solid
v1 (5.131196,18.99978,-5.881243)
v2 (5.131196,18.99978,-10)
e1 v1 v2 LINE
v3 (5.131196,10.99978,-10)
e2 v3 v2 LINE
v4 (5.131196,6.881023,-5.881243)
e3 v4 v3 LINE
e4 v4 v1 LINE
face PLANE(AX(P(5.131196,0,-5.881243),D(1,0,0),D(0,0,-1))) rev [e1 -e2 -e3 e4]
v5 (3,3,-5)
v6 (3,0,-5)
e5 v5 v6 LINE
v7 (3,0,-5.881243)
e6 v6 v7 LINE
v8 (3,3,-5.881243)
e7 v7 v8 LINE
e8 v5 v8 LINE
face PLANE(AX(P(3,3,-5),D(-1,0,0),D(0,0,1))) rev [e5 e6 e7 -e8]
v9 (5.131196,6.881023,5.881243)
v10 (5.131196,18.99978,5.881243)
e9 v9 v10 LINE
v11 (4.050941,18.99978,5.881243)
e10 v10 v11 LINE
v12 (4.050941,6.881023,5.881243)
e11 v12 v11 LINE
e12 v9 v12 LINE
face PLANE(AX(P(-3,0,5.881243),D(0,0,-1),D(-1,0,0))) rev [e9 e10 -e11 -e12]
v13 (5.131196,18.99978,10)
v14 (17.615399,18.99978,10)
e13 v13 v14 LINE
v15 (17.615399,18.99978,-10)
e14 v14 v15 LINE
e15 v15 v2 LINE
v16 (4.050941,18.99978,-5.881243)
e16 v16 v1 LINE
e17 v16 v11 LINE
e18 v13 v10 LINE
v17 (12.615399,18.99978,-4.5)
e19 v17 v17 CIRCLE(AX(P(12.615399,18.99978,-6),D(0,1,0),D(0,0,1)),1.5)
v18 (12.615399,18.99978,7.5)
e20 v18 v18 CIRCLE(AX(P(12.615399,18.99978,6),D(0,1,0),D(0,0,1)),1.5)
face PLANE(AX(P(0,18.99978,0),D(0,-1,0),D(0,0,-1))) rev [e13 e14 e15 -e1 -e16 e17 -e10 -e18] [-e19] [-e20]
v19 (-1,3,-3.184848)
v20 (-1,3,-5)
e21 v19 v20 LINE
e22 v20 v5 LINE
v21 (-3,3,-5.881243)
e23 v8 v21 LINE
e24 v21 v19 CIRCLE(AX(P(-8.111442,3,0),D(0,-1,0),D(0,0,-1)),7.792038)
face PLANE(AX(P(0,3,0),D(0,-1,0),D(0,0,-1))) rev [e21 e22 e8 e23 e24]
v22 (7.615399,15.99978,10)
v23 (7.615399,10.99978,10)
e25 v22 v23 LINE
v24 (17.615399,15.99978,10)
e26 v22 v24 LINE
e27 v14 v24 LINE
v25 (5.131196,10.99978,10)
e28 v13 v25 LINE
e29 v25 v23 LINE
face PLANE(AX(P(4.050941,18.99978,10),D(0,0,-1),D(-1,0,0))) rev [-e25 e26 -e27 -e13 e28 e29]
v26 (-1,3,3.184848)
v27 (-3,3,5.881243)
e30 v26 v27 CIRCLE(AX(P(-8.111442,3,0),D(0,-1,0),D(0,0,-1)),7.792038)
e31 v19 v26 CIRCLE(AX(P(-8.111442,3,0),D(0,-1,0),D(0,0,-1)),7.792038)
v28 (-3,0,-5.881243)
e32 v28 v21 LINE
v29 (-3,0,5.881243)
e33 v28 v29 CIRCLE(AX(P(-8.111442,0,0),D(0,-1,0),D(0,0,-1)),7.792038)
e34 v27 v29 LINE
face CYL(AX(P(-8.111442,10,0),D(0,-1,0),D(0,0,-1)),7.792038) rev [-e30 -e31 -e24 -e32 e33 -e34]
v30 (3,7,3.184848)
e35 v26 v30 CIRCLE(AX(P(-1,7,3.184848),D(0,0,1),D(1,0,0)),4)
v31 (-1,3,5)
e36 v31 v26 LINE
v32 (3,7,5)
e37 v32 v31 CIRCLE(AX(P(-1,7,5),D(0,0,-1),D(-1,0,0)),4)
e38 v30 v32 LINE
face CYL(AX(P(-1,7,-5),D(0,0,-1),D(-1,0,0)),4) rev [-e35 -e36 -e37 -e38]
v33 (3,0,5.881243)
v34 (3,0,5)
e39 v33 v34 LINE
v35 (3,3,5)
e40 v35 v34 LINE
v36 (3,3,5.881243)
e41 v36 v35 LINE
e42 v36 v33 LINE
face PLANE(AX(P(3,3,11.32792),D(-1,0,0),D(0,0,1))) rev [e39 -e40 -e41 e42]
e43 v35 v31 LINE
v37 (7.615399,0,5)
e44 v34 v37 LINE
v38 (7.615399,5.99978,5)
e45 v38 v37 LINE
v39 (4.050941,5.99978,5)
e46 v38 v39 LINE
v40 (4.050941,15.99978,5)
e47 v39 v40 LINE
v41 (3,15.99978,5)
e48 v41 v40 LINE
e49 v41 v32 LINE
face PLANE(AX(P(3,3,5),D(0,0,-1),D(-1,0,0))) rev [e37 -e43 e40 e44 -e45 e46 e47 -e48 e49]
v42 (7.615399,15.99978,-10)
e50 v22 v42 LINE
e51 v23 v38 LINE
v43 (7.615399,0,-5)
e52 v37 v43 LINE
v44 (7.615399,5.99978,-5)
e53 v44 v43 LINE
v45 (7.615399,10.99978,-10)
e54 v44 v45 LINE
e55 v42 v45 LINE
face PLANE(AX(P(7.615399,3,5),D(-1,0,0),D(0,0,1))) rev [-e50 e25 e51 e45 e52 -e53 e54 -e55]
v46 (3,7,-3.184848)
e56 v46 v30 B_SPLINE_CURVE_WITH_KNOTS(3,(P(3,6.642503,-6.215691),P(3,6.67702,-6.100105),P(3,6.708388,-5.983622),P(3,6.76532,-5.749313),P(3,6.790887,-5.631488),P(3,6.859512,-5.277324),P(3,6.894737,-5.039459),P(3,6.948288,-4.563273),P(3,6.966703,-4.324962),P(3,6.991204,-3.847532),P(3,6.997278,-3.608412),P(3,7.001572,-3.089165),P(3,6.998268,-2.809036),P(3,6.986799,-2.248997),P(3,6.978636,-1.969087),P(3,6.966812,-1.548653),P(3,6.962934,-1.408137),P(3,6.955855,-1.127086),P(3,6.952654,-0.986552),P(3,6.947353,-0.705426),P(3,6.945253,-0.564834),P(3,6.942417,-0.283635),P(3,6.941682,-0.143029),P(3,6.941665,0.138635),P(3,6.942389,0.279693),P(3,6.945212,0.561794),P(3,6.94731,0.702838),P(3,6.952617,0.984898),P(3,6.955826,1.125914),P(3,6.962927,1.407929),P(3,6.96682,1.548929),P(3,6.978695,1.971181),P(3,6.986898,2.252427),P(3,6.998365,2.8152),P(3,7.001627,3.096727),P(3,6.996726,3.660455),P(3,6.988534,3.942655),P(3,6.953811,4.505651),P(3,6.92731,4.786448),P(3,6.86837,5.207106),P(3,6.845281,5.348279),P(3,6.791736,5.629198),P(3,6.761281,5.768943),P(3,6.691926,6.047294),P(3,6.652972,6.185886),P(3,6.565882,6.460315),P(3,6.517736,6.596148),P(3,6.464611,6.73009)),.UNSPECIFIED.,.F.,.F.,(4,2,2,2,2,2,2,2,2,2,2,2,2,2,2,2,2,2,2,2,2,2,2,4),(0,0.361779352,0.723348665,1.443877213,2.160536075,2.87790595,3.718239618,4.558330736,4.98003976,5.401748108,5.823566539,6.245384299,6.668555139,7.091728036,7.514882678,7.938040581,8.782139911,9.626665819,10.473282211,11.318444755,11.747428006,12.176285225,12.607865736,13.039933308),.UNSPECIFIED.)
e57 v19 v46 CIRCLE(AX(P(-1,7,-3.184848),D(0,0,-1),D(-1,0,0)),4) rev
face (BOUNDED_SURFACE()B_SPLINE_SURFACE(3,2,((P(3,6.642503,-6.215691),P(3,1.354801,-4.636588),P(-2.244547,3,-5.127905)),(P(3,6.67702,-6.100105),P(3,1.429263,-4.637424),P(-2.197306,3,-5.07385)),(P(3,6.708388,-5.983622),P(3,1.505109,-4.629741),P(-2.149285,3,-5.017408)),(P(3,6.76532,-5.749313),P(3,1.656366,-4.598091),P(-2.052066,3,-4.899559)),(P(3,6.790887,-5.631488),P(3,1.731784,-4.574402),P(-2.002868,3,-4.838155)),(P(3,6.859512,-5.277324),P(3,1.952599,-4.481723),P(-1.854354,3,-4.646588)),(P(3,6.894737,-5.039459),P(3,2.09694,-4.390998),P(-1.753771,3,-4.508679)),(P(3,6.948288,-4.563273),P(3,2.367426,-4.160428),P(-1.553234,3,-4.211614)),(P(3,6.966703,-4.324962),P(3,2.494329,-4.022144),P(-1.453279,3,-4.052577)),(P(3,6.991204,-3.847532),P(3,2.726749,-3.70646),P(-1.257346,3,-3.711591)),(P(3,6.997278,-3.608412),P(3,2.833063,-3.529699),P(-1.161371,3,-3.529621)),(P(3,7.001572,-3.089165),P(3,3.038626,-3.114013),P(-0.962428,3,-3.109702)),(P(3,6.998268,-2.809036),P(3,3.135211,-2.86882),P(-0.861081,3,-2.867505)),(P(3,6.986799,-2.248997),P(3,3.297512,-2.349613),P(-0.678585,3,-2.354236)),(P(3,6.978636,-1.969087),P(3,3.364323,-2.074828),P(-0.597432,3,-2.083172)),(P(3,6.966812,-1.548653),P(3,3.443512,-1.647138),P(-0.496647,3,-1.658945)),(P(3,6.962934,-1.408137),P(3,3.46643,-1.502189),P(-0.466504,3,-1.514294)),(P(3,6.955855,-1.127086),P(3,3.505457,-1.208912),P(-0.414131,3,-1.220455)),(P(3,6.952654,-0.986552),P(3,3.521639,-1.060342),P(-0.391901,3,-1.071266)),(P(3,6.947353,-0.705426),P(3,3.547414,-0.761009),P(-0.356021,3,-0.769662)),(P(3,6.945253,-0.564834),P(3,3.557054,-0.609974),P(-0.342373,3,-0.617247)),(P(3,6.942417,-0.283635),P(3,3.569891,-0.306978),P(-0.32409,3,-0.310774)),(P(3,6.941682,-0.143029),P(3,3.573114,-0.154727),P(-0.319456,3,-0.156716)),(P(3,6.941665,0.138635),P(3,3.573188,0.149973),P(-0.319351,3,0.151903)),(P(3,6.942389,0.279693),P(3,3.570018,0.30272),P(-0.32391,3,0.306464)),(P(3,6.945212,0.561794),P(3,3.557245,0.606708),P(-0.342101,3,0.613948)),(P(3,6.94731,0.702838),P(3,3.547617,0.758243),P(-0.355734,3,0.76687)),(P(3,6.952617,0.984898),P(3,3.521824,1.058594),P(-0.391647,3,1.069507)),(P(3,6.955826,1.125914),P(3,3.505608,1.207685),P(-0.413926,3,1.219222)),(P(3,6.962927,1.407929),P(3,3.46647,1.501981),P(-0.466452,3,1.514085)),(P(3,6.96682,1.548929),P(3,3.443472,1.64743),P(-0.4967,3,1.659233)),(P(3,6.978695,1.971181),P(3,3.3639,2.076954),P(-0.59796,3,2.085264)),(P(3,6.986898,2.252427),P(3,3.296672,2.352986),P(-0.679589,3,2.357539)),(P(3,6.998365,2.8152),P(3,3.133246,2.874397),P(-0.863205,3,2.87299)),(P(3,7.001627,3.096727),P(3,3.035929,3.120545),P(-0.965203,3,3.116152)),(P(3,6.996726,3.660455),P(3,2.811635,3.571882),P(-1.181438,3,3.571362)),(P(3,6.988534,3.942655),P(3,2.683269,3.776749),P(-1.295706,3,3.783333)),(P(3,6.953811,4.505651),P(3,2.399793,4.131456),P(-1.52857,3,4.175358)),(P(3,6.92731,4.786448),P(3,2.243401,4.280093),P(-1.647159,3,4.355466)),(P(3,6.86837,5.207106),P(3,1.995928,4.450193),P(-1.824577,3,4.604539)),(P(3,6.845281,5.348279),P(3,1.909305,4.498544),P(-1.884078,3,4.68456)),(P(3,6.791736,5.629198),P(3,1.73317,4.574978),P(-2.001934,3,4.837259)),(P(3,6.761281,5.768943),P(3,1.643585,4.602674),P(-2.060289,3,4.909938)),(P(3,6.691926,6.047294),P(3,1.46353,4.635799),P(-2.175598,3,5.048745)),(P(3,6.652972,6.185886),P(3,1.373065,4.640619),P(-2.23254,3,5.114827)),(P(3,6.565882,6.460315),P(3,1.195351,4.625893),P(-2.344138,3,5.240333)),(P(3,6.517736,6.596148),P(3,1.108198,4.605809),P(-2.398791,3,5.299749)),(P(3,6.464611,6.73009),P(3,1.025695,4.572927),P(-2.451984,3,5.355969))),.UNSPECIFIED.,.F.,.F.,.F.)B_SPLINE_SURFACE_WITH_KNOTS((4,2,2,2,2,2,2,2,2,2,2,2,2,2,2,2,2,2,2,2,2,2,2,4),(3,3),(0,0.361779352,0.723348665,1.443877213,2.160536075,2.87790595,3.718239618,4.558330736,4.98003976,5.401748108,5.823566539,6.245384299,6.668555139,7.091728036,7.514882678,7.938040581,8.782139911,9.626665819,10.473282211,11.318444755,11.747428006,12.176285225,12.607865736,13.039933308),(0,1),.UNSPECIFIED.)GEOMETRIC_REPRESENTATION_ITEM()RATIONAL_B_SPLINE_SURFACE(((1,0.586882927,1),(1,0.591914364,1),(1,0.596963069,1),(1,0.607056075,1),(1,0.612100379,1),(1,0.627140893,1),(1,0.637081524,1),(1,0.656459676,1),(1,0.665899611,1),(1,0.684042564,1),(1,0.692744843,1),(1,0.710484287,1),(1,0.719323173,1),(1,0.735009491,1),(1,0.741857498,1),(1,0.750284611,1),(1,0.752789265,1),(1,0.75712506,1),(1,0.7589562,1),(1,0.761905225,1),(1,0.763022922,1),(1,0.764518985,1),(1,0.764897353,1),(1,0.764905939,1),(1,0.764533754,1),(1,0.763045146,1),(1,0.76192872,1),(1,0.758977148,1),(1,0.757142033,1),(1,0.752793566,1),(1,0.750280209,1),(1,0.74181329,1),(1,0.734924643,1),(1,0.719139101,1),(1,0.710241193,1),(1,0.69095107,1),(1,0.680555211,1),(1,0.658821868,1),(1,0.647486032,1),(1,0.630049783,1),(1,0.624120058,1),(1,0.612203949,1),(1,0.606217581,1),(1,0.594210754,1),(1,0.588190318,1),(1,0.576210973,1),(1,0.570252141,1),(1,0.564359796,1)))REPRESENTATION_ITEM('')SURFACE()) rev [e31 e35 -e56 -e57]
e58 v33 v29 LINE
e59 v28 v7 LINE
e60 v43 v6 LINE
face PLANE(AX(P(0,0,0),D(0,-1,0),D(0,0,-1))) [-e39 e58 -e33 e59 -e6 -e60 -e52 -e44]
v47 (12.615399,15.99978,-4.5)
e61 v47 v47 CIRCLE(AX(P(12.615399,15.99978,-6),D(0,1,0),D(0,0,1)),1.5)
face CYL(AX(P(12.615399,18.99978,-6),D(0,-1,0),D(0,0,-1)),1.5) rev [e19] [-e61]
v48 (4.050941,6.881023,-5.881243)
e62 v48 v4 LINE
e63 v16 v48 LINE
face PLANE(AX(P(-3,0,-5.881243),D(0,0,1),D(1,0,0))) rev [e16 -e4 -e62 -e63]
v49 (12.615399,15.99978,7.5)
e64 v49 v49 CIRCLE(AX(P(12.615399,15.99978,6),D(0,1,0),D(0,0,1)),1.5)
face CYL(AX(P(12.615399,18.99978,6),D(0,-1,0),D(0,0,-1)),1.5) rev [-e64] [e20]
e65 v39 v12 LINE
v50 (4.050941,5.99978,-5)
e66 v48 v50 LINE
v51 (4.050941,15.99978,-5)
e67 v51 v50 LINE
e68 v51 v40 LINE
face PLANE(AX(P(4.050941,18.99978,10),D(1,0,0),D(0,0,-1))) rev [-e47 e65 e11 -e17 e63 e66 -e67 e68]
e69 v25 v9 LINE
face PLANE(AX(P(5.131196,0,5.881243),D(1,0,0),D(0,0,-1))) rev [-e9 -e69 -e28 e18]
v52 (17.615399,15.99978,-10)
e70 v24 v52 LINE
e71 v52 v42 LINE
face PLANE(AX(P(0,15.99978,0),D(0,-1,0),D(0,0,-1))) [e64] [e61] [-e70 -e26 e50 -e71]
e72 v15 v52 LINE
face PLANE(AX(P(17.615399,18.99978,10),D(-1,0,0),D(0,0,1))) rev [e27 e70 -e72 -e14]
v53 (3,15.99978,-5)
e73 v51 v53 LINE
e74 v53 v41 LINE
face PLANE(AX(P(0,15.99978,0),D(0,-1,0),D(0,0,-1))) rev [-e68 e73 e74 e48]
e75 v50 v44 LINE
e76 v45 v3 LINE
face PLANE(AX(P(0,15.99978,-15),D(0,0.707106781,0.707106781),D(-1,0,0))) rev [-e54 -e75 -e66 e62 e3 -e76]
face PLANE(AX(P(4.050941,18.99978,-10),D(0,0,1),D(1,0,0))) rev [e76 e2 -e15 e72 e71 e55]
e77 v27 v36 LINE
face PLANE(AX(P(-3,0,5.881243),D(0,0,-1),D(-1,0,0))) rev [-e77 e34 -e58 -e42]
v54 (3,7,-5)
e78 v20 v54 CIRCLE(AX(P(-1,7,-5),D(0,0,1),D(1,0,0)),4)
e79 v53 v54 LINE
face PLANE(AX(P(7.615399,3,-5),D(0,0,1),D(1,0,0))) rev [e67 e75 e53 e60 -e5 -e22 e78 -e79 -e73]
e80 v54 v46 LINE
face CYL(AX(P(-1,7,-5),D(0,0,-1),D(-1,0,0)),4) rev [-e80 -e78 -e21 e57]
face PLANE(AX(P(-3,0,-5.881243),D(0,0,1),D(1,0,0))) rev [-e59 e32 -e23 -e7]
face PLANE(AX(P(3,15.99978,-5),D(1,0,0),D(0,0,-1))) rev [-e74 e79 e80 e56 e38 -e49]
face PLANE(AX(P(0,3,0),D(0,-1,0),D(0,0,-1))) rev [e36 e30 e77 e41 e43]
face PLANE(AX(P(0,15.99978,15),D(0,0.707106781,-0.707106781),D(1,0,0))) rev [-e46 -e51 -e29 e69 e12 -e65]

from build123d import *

# Parameters (mm, degrees)
SKETCH1_R               = 1.5
BOSS_EXTRUDE1_DEPTH     = 3
SKETCH3_W               = 4.615398666
SKETCH3_H               = 10
BOSS_EXTRUDE2_DEPTH     = 12.9997796
FILLET7_R               = 1
CUT_EXTRUDE4_DEPTH      = 10
SKETCH9_W               = 13.564457496
SKETCH9_H               = 20
SKETCH9_R               = 1.5
BOSS_EXTRUDE3_DEPTH     = 3
CHAMFER1_SIZE           = 10
CHAMFER2_SIZE           = 10
FILLET8_R               = 4
CUT_EXTRUDE5_DEPTH      = 27.355587635
CUT_EXTRUDE5_DEPTH_BACK = 27.355587635
SKETCH10_W              = 8.131195533
SKETCH10_H              = 6.749631571
SKETCH10_H_2            = 7.013496214


with BuildPart() as part:
    # Sketch1 → Boss-Extrude1 (new body)
    with BuildSketch(Plane(origin=(0, 0, 0), x_dir=(1, 0, 0), z_dir=(0, 1, 0))):
        Polygon((-3, -11.32792047), (3, -11.32792047), (3, -5), (7.615398666, -5), (7.615398666, 5), (3, 5), (3, 11.32792047), (-3, 11.32792047), align=None)
        with Locations(Location((0, 8.5, 0), (0, 0, 270))):
            Circle(SKETCH1_R, mode=Mode.SUBTRACT)
        with Locations(Location((0, -8.5, 0), (0, 0, 270))):
            Circle(SKETCH1_R, mode=Mode.SUBTRACT)
    extrude(amount=BOSS_EXTRUDE1_DEPTH)

    # Sketch3 → Boss-Extrude2 (add)
    with BuildSketch(Plane(origin=(0, 3, 0), x_dir=(1, 0, 0), z_dir=(0, 1, 0))):
        with Locations((5.307699333, 0)):
            Rectangle(SKETCH3_W, SKETCH3_H)
    extrude(amount=BOSS_EXTRUDE2_DEPTH)

    # Fillet7
    fillet7_edges = [part.edges().sort_by_distance(p)[0] for p in [
        (3, 1.5, 11.32792047),
        (3, 1.5, -11.32792047),
    ]]
    fillet(fillet7_edges, radius=FILLET7_R)

    # Sketch7 → Cut-Extrude4 (cut)
    with BuildSketch(Plane.XZ):
        with BuildLine():
            Line((-3.65526474, -6.392053518), (-3.78188192, 6.478485425))
            ThreePointArc((-3.78188192, 6.478485425), (-0.319780446, 0.076652438), (-3.65526474, -6.392053518))
        make_face()
    extrude(amount=-CUT_EXTRUDE4_DEPTH, mode=Mode.SUBTRACT)

    # Sketch9 → Boss-Extrude3 (add)
    with BuildSketch(Plane(origin=(0, 15.9997796, 0), x_dir=(1, 0, 0), z_dir=(0, 1, 0))):
        with Locations((10.833169918, 0)):
            Rectangle(SKETCH9_W, SKETCH9_H)
        with Locations(Location((12.615398666, 6, 0), (0, 0, 270))):
            Circle(SKETCH9_R, mode=Mode.SUBTRACT)
        with Locations(Location((12.615398666, -6, 0), (0, 0, 270))):
            Circle(SKETCH9_R, mode=Mode.SUBTRACT)
    extrude(amount=BOSS_EXTRUDE3_DEPTH)

    # Chamfer1
    # the kernel refuses this chamfer: 10 mm, written as the material it adds along each edge
    with BuildSketch(Plane(origin=(4.05094117, 15.9997796, 5), x_dir=(0, -0.9996219169112968, -0.027495876610586403), z_dir=(1, 0, 0))) as chamfer1_piece_1_section:
        Polygon((CHAMFER1_SIZE * 0.999621916911, -CHAMFER1_SIZE * 0.0274958766106), (-CHAMFER1_SIZE * 0.0274958766106, -CHAMFER1_SIZE * 0.999621916911), (0, 0), align=None)
    chamfer1_piece_1 = extrude(amount=3.564457497, mode=Mode.PRIVATE)
    chamfer1_piece_1 = split(chamfer1_piece_1, bisect_by=Plane(origin=(5.833169918, 12.110890711, 10), z_dir=(0, 0, -1)), keep=Keep.TOP, mode=Mode.PRIVATE)
    add(chamfer1_piece_1)

    # Chamfer2
    # the kernel refuses this chamfer: 10 mm, written as the material it adds along each edge
    with BuildSketch(Plane(origin=(7.615398666, 15.9997796, -5), x_dir=(0, -0.9996219169112968, 0.027495876610586403), z_dir=(-1, 0, 0))) as chamfer2_piece_1_section:
        Polygon((CHAMFER2_SIZE * 0.999621916911, -CHAMFER2_SIZE * 0.0274958766106), (-CHAMFER2_SIZE * 0.0274958766106, -CHAMFER2_SIZE * 0.999621916911), (0, 0), align=None)
    chamfer2_piece_1 = extrude(amount=3.564457497, mode=Mode.PRIVATE)
    chamfer2_piece_1 = split(chamfer2_piece_1, bisect_by=Plane(origin=(5.833169918, 12.110890711, -10), z_dir=(0, 0, 1)), keep=Keep.TOP, mode=Mode.PRIVATE)
    add(chamfer2_piece_1)

    # Fillet8
    fillet8_edges = [part.edges().sort_by_distance(p)[0] for p in [
        (3, 3, 0),
    ]]
    fillet(fillet8_edges, radius=FILLET8_R)

    # Sketch10 → Cut-Extrude5 (cut, two sides: drawn at the far end of the back side and taken through both)
    with BuildSketch(Plane(origin=(0, 3, 0), x_dir=(1, 0, 0), z_dir=(0, 1, 0)).offset(-CUT_EXTRUDE5_DEPTH_BACK)):
        with Locations((1.065597767, 9.256059268)):
            Rectangle(SKETCH10_W, SKETCH10_H)
        with Locations((1.065597767, -9.38799159)):
            Rectangle(SKETCH10_W, SKETCH10_H_2)
    extrude(amount=CUT_EXTRUDE5_DEPTH + CUT_EXTRUDE5_DEPTH_BACK, mode=Mode.SUBTRACT)


solid = part.part
